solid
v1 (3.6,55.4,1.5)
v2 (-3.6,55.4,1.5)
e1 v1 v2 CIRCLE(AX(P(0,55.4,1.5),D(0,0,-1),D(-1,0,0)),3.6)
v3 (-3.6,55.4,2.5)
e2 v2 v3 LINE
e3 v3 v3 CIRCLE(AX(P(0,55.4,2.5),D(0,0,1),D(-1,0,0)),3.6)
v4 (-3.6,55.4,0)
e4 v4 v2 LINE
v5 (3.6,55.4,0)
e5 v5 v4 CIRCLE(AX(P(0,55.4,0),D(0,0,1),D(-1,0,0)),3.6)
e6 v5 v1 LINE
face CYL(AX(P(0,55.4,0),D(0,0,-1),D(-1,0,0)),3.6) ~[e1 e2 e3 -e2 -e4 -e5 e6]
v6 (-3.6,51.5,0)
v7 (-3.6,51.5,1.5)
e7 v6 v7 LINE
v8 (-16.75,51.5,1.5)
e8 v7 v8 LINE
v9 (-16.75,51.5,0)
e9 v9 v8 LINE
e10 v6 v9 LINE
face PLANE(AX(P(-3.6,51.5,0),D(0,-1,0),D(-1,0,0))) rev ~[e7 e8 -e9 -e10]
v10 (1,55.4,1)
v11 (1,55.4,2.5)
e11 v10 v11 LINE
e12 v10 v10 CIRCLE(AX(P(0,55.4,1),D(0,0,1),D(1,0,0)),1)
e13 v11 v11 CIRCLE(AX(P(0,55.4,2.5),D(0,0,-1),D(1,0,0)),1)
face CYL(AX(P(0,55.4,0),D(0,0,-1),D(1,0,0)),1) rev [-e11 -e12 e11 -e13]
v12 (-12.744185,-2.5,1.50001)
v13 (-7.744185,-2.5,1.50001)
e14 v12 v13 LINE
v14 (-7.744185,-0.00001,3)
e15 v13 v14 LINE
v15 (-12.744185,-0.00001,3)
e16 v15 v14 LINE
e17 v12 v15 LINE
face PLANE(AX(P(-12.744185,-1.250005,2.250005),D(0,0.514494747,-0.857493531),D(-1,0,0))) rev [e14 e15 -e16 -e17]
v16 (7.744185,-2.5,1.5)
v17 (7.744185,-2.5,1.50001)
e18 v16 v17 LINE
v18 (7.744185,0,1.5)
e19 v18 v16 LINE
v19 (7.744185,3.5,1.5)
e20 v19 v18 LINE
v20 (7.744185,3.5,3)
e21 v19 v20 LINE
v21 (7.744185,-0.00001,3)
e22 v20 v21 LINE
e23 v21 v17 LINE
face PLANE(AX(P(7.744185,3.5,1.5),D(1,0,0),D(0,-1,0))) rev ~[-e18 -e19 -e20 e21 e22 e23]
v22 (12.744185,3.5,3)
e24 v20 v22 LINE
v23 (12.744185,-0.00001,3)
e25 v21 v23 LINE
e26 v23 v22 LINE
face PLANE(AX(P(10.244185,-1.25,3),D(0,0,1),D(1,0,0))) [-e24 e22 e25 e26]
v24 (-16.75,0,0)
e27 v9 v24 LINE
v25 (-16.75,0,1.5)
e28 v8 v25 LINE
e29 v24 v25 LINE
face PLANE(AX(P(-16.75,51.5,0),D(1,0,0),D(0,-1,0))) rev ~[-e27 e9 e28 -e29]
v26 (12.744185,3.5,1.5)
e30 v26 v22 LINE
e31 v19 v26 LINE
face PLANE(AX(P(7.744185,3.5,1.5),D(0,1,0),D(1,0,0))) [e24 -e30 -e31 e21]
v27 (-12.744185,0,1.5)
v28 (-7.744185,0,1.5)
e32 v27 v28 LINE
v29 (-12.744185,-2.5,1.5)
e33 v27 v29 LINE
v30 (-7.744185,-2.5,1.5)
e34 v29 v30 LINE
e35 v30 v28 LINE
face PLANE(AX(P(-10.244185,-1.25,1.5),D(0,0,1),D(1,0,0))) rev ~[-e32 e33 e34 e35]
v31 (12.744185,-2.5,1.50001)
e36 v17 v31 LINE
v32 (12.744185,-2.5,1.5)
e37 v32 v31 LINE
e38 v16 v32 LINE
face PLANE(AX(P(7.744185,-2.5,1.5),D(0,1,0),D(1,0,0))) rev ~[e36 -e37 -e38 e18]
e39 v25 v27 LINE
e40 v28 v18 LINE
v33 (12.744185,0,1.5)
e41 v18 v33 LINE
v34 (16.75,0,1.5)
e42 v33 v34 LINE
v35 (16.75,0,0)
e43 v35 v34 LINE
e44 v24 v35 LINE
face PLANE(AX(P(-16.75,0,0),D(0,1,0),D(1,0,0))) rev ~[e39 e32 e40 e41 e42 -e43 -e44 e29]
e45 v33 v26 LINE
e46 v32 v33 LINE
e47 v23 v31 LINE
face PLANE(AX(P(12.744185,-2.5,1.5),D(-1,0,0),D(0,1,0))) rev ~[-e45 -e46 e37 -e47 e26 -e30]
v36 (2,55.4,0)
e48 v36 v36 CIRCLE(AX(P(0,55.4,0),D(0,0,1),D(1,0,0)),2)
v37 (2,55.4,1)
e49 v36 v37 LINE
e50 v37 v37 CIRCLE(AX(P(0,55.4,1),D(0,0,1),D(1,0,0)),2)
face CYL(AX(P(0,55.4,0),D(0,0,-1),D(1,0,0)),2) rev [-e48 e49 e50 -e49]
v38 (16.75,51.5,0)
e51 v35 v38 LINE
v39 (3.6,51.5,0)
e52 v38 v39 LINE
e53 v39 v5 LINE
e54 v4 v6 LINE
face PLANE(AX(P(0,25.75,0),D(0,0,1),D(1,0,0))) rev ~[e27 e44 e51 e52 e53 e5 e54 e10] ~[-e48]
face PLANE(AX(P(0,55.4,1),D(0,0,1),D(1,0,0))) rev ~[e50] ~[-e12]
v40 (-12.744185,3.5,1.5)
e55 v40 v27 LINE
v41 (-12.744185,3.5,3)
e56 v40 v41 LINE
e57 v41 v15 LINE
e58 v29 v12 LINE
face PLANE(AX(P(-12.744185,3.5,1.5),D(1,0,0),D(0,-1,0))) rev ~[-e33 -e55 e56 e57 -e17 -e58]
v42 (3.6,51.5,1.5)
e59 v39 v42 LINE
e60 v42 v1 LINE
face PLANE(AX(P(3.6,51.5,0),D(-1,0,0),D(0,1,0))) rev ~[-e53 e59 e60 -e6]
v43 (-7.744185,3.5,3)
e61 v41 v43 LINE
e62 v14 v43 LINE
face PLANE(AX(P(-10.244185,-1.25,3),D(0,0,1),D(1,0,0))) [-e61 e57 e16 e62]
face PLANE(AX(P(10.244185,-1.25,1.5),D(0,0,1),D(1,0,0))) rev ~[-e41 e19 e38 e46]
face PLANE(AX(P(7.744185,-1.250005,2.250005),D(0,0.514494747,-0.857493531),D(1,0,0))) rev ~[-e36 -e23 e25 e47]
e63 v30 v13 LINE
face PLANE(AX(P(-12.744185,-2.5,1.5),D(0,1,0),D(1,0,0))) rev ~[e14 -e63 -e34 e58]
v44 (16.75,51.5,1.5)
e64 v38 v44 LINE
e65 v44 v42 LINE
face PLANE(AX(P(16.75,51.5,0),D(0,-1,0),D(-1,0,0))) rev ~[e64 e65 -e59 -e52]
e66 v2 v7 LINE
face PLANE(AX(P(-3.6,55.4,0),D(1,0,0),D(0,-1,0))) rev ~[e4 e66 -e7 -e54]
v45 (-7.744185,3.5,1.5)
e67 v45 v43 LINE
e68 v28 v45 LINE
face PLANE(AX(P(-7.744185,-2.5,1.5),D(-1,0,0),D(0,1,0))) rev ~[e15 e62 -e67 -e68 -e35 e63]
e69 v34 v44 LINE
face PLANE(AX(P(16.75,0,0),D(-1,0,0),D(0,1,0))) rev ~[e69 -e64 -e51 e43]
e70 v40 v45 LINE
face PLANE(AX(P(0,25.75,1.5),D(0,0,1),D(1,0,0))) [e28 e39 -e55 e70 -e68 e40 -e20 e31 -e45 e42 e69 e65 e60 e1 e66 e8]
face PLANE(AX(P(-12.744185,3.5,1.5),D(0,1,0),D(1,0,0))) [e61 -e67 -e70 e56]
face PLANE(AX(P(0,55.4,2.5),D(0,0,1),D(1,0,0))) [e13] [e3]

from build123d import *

# Parameters (mm, degrees)
F0_R     = 2
F0_R_2   = 1
F1_DEPTH = 1.5
F2_DEPTH = 2.5
F3_W     = 5
F3_H     = 2.5
F3_H_2   = 3.5
F4_DEPTH = 1.5
F5_SIZE2 = 2.49999
F5_SIZE  = 1.49999
F6_SIZE2 = 1.49999
F6_SIZE  = 2.49999
F7_DEPTH = 25
F8_DEPTH = 1


# Not quite as in the source:
# - a fillet or chamfer is up to 0.001 mm smaller than in the source, because OpenCascade refuses the exact size
# - a feature names something its author has since deleted; it is built from what else it names


with BuildPart() as f1:
    # F0 (on Top) → F1 (new body)
    with BuildSketch(Plane.XY):
        Polygon((-16.75, 0), (0, 0), (16.75, 0), (16.75, 51.5), (3.6, 51.5), (0, 51.5), (-3.6, 51.5), (-16.75, 51.5), align=None)
        with BuildLine():
            ThreePointArc((3.6, 55.4), (0, 59), (-3.6, 55.4))
            ThreePointArc((-3.6, 55.4), (0, 51.8), (3.6, 55.4))
        make_face()
        with Locations((0, 55.4)):
            Circle(F0_R, mode=Mode.SUBTRACT)
        with Locations((0, 55.4)):
            Circle(F0_R)
        with Locations((0, 55.4)):
            Circle(F0_R_2, mode=Mode.SUBTRACT)
        with BuildLine():
            Line((-3.6, 55.4), (-3.6, 51.5))
            Line((-3.6, 51.5), (0, 51.5))
            Line((0, 51.5), (3.6, 51.5))
            Line((3.6, 51.5), (3.6, 55.4))
            ThreePointArc((3.6, 55.4), (0, 51.8), (-3.6, 55.4))
        make_face()
        with Locations((0, 55.4)):
            Circle(F0_R_2)
    extrude(amount=F1_DEPTH)

    # F0 (on Top) → F2 (join)
    with BuildSketch(Plane.XY):
        with BuildLine():
            ThreePointArc((3.6, 55.4), (0, 59), (-3.6, 55.4))
            ThreePointArc((-3.6, 55.4), (0, 51.8), (3.6, 55.4))
        make_face()
        with Locations((0, 55.4)):
            Circle(F0_R, mode=Mode.SUBTRACT)
        with Locations((0, 55.4)):
            Circle(F0_R)
        with Locations((0, 55.4)):
            Circle(F0_R_2, mode=Mode.SUBTRACT)
        with Locations((0, 55.4)):
            Circle(F0_R_2)
    extrude(amount=F2_DEPTH)

    # F3 (on face) → F4 (join)
    with BuildSketch(Plane.XY.offset(1.5)):
        with Locations((-10.2441851608, -1.25)):
            Rectangle(F3_W, F3_H)
        with Locations((-10.2441851608, 1.75)):
            Rectangle(F3_W, F3_H_2)
        with Locations((10.2441851608, -1.25)):
            Rectangle(F3_W, F3_H)
        with Locations((10.2441851608, 1.75)):
            Rectangle(F3_W, F3_H_2)
    extrude(amount=F4_DEPTH)

    # F5 (size 1.5 and 2.5 in the source; OpenCascade refuses exactly that, so slightly less here)
    f5_edges = [f1.edges().sort_by_distance(p)[0] for p in [
        (-10.244185, -2.5, 3),
    ]]
    f5_side = f1.faces().sort_by_distance((-10.244185, -2.5, 2.25))[0]
    chamfer(f5_edges, length=F5_SIZE, length2=F5_SIZE2, reference=f5_side)

    # F6 (size 2.5 and 1.5 in the source; OpenCascade refuses exactly that, so slightly less here)
    f6_edges = [f1.edges().sort_by_distance(p)[0] for p in [
        (10.244185, -2.5, 3),
    ]]
    f6_side = f1.faces().sort_by_distance((10.244185, 0.5, 3))[0]
    chamfer(f6_edges, length=F6_SIZE, length2=F6_SIZE2, reference=f6_side)

    # F0 (on Top) → F7 (cut)
    with BuildSketch(Plane.XY):
        with Locations((0, 55.4)):
            Circle(F0_R_2)
    extrude(amount=F7_DEPTH, mode=Mode.SUBTRACT)

    # F0 (on Top) → F8 (cut)
    with BuildSketch(Plane.XY):
        with Locations((0, 55.4)):
            Circle(F0_R)
        with Locations((0, 55.4)):
            Circle(F0_R_2, mode=Mode.SUBTRACT)
    extrude(amount=F8_DEPTH, mode=Mode.SUBTRACT)


solid = f1.part
